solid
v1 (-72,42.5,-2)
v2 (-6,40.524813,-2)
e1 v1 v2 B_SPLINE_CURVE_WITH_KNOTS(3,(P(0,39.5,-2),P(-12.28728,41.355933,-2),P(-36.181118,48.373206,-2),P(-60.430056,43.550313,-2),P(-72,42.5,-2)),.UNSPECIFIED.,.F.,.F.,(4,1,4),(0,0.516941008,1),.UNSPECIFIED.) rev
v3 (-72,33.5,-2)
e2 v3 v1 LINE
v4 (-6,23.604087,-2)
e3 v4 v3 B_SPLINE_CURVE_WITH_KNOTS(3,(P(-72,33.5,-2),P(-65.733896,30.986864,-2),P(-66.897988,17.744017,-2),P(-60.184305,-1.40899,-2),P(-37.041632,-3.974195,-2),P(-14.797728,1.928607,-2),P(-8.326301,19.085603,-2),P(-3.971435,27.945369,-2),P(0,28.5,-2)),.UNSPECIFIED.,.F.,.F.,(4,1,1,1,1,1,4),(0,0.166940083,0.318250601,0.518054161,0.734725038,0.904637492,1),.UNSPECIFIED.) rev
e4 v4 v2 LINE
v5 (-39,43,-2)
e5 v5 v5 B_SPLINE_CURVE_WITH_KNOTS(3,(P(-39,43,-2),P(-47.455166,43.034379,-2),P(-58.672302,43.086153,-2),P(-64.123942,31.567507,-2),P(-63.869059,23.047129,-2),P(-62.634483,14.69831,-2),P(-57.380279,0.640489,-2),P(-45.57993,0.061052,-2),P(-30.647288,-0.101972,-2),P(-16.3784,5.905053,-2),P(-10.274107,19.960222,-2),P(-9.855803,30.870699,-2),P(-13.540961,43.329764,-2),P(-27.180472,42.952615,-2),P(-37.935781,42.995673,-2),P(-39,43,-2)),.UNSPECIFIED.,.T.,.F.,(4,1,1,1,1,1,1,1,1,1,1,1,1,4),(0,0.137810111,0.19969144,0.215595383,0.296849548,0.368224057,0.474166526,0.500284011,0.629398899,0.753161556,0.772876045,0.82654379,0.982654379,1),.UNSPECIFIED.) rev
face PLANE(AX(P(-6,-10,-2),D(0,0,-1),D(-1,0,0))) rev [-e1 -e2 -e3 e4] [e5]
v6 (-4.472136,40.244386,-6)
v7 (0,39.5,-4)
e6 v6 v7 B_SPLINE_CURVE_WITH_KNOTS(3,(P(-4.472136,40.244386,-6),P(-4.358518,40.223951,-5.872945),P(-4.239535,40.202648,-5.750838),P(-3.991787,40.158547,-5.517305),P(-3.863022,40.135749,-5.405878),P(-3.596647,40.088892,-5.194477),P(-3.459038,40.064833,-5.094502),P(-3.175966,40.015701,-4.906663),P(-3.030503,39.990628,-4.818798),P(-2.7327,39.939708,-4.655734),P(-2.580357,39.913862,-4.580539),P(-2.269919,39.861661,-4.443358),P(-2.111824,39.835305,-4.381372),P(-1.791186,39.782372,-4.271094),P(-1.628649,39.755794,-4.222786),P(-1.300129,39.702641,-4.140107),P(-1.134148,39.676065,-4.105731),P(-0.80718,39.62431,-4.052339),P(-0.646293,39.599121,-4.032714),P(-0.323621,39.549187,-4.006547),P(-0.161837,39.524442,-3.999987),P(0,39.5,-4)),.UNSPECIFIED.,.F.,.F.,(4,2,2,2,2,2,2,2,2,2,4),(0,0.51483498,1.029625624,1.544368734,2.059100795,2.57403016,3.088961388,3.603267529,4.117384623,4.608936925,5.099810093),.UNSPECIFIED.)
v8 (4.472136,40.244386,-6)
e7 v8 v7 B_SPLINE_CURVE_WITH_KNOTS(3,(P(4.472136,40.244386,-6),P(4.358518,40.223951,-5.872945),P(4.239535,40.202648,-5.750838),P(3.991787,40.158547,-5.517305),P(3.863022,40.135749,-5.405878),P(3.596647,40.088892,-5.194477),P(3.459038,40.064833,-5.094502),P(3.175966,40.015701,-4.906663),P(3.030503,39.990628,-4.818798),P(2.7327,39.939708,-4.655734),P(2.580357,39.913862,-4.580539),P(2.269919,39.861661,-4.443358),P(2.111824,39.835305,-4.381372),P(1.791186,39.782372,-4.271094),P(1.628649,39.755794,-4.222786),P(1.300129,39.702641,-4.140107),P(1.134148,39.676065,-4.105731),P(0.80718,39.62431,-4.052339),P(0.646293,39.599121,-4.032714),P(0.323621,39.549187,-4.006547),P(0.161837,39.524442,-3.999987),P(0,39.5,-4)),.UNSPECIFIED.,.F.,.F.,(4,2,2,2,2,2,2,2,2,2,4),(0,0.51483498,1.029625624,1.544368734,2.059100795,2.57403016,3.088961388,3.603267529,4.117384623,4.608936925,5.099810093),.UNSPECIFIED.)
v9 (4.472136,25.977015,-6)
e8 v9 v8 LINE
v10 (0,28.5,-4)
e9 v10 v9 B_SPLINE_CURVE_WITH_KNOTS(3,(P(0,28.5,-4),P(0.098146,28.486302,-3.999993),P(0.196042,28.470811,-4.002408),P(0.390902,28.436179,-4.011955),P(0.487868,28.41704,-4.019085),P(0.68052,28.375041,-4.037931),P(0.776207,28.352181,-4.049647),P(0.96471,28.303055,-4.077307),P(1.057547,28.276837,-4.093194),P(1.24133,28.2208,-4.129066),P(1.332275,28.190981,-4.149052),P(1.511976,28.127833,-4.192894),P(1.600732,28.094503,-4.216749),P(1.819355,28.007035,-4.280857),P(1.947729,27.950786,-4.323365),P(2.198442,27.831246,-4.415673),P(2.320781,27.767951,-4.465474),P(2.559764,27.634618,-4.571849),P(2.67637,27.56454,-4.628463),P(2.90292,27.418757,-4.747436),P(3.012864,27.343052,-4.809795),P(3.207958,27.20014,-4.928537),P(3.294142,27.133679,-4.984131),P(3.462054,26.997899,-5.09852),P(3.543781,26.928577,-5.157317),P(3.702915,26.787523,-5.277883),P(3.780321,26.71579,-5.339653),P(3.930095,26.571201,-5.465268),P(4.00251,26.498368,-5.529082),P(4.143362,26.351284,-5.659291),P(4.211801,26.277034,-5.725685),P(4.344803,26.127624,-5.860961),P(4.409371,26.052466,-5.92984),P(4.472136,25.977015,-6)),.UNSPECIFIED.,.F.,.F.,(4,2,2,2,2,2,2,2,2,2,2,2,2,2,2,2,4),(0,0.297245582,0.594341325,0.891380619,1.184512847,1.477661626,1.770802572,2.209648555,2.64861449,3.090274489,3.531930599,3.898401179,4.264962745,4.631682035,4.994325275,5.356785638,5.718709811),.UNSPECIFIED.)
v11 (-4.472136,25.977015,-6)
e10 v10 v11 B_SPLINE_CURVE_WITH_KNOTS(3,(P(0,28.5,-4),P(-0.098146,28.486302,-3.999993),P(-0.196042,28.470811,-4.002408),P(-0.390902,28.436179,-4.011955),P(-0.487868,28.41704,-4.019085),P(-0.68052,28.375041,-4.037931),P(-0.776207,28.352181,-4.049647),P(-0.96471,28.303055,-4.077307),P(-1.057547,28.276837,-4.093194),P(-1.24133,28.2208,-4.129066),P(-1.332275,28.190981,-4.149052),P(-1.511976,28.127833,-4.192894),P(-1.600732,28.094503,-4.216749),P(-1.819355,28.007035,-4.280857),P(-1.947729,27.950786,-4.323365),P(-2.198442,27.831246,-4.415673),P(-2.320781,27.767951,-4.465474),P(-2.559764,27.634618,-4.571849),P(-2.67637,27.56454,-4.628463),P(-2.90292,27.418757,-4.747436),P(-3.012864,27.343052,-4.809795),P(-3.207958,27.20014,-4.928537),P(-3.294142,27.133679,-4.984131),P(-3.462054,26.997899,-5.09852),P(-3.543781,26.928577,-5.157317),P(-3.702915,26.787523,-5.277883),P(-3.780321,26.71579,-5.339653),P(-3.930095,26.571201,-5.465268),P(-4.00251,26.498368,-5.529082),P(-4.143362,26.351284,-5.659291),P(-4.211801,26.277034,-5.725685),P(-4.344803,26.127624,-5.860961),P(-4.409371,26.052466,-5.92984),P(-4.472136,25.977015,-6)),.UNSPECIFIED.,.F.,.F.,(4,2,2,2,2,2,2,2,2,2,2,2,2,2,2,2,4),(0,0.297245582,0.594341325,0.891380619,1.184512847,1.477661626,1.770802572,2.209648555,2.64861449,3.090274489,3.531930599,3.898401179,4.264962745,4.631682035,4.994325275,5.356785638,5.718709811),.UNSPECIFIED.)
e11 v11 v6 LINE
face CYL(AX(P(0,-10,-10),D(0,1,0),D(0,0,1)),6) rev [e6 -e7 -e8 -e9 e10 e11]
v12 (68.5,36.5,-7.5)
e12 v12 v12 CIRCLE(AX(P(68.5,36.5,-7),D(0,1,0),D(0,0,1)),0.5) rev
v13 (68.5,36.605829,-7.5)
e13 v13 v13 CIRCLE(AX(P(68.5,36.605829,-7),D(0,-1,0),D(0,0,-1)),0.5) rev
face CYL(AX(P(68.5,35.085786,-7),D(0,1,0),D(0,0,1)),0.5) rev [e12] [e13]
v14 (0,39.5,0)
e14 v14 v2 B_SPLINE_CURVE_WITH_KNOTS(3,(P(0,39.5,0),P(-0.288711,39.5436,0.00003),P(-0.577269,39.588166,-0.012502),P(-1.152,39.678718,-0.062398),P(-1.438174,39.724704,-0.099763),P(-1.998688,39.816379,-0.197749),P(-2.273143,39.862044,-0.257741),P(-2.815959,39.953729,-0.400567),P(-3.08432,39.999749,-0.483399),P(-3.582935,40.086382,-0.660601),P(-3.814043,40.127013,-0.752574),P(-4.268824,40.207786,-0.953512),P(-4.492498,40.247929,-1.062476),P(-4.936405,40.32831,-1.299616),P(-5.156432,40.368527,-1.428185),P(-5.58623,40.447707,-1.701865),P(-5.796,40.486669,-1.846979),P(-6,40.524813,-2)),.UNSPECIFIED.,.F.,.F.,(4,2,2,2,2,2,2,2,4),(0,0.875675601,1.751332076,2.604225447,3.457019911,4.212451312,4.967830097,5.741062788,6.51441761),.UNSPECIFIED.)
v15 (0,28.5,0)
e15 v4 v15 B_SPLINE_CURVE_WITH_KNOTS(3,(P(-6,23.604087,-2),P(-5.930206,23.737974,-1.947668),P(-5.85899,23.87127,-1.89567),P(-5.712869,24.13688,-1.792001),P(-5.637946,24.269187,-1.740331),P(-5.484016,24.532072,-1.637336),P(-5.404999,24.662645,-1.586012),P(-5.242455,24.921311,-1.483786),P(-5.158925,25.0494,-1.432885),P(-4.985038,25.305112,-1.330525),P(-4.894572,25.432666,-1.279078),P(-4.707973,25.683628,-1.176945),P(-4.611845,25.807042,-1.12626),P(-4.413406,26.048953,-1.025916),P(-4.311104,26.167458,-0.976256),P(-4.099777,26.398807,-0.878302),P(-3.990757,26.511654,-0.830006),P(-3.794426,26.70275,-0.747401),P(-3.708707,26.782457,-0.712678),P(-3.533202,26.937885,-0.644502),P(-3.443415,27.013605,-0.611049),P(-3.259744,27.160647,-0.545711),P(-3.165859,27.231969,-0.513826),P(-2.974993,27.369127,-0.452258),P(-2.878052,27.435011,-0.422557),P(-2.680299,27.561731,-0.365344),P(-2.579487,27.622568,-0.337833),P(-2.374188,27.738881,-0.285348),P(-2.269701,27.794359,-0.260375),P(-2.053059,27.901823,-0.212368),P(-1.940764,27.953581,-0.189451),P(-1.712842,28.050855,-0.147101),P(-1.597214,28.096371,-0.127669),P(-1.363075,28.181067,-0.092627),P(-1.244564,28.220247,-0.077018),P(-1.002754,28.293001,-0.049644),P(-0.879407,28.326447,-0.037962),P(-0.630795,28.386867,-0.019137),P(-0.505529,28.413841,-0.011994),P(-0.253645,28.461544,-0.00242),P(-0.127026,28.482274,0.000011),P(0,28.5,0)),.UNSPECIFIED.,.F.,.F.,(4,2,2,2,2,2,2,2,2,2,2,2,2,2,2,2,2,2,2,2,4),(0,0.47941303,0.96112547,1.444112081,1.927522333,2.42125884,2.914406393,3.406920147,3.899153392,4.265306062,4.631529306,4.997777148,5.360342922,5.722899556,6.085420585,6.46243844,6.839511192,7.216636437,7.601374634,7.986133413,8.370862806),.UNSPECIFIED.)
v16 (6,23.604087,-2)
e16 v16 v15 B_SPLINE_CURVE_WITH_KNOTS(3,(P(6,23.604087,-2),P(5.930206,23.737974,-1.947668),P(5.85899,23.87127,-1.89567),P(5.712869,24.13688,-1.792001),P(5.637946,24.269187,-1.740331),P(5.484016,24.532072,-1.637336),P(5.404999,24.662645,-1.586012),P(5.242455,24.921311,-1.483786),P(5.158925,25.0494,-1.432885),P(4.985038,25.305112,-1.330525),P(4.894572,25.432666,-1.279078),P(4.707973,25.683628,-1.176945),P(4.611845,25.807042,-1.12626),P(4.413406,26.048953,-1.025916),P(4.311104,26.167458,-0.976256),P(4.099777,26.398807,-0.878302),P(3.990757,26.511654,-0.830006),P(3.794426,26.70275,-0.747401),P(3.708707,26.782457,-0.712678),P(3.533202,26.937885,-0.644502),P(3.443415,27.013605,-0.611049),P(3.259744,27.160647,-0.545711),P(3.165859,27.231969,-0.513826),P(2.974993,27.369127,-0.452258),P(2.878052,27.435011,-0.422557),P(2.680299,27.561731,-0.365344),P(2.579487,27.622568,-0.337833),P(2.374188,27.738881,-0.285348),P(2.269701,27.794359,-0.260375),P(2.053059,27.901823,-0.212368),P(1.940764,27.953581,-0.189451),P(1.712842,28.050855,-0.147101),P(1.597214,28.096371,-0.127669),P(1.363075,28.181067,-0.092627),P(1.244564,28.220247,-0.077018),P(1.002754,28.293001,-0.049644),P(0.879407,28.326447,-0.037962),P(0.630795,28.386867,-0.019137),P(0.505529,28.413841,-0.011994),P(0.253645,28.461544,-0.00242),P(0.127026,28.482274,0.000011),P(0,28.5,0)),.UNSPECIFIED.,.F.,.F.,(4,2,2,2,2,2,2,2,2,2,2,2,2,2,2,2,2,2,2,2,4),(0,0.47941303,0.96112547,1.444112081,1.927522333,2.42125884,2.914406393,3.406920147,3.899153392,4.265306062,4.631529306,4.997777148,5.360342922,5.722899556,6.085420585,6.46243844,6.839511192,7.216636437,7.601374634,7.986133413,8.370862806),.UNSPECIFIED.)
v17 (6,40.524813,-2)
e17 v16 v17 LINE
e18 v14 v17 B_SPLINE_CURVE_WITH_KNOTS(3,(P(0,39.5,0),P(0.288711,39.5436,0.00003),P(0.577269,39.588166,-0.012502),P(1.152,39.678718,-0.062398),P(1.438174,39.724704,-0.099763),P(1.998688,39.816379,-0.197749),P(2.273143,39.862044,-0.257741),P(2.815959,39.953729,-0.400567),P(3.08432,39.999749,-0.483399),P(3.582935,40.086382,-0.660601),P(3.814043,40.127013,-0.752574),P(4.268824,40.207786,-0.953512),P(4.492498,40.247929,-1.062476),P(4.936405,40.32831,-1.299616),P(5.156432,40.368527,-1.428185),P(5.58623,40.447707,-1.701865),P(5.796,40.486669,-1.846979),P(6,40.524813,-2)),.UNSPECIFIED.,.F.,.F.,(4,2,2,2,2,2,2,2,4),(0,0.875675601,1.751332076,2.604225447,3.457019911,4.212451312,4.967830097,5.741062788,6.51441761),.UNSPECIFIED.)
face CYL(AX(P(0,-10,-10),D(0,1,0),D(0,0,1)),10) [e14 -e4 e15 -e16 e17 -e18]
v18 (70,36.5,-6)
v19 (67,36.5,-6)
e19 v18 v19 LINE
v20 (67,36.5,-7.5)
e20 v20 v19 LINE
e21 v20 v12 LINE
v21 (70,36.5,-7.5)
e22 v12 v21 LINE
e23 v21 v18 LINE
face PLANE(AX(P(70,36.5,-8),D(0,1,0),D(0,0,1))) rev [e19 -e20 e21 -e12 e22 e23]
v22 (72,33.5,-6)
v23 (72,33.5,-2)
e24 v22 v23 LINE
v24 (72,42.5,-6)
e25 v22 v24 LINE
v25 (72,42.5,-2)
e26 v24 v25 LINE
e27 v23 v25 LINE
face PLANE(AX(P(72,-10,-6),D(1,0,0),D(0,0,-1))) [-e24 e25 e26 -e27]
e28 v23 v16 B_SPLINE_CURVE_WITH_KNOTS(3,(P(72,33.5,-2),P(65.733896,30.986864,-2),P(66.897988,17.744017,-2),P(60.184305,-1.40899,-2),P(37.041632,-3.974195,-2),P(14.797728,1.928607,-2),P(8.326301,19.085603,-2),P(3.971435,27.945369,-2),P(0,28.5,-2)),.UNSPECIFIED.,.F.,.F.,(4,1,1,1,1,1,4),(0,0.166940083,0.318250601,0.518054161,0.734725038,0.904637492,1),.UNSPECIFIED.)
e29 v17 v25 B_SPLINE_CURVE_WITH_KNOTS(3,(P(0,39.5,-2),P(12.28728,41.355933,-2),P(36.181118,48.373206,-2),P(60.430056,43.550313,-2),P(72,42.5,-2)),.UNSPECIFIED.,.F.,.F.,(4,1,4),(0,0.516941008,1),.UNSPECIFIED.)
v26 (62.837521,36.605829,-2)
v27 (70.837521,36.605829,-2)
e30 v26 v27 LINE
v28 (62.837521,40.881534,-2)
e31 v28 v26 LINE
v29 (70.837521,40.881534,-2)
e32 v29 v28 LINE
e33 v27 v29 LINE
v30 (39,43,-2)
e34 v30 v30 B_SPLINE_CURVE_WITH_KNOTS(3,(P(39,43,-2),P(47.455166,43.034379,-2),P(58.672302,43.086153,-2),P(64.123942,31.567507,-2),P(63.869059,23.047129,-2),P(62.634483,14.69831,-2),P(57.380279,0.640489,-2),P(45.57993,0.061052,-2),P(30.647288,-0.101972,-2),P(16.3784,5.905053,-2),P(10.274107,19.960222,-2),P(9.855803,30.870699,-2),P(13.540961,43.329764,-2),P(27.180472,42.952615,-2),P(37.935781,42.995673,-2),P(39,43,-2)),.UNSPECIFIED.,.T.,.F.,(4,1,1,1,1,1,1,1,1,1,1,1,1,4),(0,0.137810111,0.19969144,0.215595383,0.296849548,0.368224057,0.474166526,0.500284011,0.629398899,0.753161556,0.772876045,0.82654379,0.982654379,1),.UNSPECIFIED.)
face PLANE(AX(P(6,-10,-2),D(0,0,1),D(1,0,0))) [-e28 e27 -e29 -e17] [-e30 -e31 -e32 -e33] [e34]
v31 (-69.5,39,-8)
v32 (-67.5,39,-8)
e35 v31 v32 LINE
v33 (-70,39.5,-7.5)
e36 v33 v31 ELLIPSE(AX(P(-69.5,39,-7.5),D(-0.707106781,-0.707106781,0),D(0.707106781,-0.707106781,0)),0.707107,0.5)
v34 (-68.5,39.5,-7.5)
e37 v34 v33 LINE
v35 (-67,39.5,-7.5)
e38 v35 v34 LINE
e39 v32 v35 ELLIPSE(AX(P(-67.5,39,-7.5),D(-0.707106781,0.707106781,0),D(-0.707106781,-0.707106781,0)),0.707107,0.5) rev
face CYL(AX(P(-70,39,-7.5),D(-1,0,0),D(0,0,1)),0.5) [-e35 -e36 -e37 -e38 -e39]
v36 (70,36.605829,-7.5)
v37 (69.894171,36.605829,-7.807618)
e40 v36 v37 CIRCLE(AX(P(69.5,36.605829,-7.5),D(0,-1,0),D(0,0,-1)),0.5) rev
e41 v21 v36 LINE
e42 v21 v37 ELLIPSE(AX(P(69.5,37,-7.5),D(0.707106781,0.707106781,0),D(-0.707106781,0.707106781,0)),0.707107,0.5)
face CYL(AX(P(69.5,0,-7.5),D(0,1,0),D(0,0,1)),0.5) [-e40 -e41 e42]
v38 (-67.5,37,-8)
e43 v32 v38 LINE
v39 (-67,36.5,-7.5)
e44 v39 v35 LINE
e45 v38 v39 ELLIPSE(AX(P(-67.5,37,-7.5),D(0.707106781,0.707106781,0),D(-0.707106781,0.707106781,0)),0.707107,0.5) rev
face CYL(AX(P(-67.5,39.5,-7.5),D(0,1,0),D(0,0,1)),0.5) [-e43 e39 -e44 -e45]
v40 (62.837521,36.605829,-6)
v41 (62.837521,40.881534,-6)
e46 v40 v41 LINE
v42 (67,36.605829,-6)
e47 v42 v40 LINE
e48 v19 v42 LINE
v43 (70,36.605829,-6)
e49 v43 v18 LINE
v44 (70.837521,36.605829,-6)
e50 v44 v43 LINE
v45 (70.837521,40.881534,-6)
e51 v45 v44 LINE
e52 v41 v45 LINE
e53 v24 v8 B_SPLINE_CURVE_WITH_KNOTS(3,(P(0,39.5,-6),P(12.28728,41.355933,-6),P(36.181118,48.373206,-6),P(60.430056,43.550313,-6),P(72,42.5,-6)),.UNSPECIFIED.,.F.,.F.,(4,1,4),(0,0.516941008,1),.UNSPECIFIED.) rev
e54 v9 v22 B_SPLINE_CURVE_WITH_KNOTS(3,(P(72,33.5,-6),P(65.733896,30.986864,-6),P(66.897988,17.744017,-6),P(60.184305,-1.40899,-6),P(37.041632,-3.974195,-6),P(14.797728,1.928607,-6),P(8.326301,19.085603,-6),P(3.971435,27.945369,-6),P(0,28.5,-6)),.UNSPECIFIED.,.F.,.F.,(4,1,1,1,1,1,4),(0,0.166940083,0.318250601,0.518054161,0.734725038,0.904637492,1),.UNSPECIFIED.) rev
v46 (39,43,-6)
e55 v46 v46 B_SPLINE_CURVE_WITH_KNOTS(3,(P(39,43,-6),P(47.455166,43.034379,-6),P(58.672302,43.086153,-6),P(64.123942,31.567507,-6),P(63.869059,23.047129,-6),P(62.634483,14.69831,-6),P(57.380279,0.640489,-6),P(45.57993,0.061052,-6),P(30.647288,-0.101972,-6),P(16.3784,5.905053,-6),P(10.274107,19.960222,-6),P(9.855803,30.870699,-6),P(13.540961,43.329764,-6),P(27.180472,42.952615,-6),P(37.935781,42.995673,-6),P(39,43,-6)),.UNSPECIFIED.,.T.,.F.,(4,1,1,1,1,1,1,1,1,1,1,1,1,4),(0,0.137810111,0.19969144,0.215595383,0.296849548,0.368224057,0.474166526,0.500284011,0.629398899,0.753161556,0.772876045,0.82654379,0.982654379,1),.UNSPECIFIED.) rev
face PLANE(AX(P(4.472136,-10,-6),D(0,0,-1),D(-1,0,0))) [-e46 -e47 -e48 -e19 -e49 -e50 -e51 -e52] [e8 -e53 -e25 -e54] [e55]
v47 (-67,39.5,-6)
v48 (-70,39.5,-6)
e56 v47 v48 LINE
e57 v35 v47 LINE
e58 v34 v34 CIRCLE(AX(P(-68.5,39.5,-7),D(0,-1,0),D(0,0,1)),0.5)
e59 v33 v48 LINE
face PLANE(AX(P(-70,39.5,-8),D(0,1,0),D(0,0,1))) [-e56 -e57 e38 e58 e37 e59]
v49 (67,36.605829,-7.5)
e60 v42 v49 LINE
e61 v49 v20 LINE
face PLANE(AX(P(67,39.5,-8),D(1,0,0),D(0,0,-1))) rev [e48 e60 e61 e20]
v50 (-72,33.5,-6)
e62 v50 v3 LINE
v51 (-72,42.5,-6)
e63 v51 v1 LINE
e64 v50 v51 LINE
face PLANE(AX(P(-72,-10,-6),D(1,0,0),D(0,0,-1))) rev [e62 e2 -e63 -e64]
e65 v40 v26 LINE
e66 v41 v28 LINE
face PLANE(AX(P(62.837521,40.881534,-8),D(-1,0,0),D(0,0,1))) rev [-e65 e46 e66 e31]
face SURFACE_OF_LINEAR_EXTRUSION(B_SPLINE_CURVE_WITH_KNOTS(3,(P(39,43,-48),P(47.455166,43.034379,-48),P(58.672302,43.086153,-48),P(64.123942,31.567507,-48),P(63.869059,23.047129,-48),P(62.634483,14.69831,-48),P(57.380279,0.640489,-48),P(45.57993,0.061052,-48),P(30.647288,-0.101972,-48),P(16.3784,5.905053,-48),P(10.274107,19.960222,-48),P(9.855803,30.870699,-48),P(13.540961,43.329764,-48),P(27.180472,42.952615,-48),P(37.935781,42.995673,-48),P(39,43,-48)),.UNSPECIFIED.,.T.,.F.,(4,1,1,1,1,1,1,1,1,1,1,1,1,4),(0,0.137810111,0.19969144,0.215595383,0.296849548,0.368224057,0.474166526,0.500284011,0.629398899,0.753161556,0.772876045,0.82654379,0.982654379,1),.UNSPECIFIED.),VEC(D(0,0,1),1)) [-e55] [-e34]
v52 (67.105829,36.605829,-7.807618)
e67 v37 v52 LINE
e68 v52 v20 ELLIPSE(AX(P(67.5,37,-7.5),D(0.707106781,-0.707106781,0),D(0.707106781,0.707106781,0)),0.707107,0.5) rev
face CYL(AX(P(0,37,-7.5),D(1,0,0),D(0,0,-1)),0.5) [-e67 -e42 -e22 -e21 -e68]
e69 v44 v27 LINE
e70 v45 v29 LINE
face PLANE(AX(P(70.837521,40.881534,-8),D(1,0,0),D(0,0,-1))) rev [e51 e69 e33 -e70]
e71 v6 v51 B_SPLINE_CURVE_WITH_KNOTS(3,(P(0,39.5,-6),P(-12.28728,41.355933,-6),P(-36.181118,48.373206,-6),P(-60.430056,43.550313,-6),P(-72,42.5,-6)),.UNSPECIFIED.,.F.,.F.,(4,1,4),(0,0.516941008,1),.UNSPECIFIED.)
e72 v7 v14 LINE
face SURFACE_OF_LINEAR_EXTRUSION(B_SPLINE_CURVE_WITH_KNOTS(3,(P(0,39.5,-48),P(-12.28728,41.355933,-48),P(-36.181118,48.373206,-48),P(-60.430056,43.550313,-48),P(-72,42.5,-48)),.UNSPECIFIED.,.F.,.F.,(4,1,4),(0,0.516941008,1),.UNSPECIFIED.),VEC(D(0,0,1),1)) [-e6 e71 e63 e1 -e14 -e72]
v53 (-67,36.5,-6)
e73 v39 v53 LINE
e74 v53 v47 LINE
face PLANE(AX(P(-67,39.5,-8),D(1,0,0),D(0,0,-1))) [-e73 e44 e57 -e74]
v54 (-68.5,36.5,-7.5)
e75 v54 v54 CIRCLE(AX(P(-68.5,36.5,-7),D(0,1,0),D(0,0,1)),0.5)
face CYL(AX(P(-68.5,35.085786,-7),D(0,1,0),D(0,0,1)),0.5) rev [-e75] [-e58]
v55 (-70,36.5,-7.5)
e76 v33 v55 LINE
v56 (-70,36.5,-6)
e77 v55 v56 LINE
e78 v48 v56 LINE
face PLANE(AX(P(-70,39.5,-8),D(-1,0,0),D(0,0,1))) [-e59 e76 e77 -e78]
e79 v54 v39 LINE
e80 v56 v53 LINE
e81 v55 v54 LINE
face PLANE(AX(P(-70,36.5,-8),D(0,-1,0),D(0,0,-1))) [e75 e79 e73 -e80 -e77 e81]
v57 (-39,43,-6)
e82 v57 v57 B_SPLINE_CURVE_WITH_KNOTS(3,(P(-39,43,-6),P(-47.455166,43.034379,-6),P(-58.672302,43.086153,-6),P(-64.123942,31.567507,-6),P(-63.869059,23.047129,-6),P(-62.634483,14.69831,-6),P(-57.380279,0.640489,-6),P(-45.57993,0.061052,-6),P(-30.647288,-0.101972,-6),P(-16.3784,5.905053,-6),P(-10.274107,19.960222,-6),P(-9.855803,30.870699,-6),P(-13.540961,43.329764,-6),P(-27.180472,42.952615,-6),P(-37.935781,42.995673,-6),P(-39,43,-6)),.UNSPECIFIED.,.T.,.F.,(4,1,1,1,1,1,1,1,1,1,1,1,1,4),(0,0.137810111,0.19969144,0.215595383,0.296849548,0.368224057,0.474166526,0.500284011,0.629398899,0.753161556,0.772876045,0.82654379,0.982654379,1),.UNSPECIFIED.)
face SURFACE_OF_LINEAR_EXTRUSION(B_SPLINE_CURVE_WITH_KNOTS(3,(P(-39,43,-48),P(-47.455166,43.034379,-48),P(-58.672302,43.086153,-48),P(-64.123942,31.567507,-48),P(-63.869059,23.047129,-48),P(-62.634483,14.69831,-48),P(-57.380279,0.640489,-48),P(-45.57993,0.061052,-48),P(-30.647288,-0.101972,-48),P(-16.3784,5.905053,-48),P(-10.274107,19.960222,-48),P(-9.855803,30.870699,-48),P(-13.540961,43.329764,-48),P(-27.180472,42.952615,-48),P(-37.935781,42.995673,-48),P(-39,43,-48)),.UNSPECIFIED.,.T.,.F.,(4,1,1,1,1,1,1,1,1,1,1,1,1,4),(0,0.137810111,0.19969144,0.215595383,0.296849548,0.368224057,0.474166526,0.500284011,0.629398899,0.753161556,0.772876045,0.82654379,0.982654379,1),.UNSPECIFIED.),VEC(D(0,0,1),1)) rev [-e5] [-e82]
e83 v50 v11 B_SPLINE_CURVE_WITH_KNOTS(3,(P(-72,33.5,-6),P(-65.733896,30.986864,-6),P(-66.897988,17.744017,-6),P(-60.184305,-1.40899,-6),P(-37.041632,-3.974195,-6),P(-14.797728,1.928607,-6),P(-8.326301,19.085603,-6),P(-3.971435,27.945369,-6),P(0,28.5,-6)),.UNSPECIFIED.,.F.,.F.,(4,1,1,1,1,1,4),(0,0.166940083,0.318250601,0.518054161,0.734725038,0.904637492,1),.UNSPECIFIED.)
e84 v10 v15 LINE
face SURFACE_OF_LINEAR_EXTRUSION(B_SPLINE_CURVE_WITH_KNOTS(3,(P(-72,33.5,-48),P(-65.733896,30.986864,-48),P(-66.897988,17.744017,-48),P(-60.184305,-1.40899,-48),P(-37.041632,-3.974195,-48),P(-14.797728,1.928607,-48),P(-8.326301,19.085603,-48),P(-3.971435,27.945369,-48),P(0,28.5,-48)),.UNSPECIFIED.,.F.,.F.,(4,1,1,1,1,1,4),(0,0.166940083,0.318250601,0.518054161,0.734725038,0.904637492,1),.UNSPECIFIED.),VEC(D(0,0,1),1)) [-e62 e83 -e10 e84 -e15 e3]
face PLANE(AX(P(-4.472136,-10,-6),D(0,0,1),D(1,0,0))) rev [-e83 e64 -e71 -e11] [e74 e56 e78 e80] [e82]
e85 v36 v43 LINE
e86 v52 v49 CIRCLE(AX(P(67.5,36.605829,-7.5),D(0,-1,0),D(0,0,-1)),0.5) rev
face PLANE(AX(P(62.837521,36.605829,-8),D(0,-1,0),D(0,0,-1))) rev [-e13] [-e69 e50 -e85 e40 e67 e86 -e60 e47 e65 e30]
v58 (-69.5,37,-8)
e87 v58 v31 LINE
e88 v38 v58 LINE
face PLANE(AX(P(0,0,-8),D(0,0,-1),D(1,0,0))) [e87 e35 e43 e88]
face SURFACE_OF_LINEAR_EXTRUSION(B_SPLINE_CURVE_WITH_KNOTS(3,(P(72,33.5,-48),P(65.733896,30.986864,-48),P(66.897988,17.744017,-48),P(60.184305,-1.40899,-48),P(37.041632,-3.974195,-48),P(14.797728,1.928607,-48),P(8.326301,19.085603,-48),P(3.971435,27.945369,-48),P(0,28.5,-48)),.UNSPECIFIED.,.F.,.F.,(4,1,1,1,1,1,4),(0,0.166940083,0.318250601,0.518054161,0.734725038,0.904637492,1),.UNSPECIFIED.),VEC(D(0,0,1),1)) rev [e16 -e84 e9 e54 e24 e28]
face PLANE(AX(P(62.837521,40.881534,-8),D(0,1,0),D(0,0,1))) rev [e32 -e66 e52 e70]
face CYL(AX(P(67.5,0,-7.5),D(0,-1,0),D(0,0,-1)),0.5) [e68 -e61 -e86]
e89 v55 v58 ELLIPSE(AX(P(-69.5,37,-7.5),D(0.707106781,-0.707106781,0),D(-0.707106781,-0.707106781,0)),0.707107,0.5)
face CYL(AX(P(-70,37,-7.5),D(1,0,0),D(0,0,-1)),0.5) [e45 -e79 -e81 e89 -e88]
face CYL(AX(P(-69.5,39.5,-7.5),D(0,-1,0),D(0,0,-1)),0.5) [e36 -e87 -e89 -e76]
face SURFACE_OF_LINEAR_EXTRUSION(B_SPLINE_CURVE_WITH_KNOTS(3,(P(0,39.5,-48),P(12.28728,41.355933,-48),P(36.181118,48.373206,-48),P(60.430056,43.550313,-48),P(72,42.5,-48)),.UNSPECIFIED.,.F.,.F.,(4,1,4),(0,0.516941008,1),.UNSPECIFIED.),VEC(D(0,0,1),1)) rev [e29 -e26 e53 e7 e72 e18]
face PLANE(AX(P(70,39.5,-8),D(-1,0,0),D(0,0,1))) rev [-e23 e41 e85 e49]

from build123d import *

# Parameters (mm, degrees)
BOSS_EXTRUDE2_START = -10
BOSS_EXTRUDE2_DEPTH = 58
CUT_EXTRUDE1_DEPTH  = 48
CUT_EXTRUDE3_DEPTH  = 48
SKETCH7_W           = 3
SKETCH7_H           = 3
BOSS_EXTRUDE4_DEPTH = 2
FILLET1_R           = 0.5
SKETCH8_R           = 0.5
CUT_EXTRUDE4_DEPTH  = 3
SKETCH9_W           = 8
SKETCH9_H           = 4.275705382
CUT_EXTRUDE6_DEPTH  = 86.382960974


# Read off the part's stored shape, not the designer's step: Mirror3
with BuildPart() as part:
    # Sketch2 → Boss-Extrude2 (new body)
    with BuildSketch(Plane(origin=(0, 0, 0), x_dir=(1, 0, 0), z_dir=(0, 1, 0)).offset(BOSS_EXTRUDE2_START)):
        with BuildLine():
            Line((6, 2), (72, 2))
            Line((72, 2), (72, 6))
            Line((72, 6), (4.472135955, 6))
            ThreePointArc((4.472135955, 6), (2.449489743, 4.522774425), (0, 4))
            Line((0, 4), (0, 0))
            ThreePointArc((0, 0), (3.16227766, 0.513167019), (6, 2))
        make_face()
    boss_extrude2 = extrude(amount=BOSS_EXTRUDE2_DEPTH)

    # Sketch4 → Cut-Extrude1 (cut)
    with BuildSketch(Plane.XY):
        with BuildLine():
            Line((75.181024804, -21.70251563), (72, 33.5))
            add(Edge.make_bspline(
                [(72, 33.5), (65.733895707, 30.986863851), (66.897988293, 17.744017336), (60.184304866, -1.408989634), (37.041632207, -3.974195098), (14.79772784, 1.928607021), (8.326301166, 19.085602566), (3.971434767, 27.945368893), (0, 28.5)],
                knots=[0, 0, 0, 0, 0.166940083, 0.318250601, 0.518054161, 0.734725038, 0.904637492, 1, 1, 1, 1], degree=3))
            Line((0, 28.5), (-1.793667206, -21.70251563))
            Line((-1.793667206, -21.70251563), (75.181024804, -21.70251563))
        make_face()
        with BuildLine():
            Line((0, 39.5), (0, 66.878987003))
            Line((0, 66.878987003), (72, 65.421074967))
            Line((72, 65.421074967), (72, 42.5))
            add(Edge.make_bspline(
                [(0, 39.5), (12.28727979, 41.355933166), (36.181117827, 48.373206471), (60.430055597, 43.550313065), (72, 42.5)],
                knots=[0, 0, 0, 0, 0.516941008, 1, 1, 1, 1], degree=3))
        make_face()
    cut_extrude1 = extrude(amount=-CUT_EXTRUDE1_DEPTH, mode=Mode.SUBTRACT)

    # Sketch3 → Cut-Extrude3 (cut)
    with BuildSketch(Plane.XY):
        with BuildLine():
            add(Edge.make_bspline(
                [(39, 43), (47.455166281, 43.034379293), (58.672301943, 43.086153016), (64.123941507, 31.567507143), (63.869059347, 23.047129354), (62.634483109, 14.698309693), (57.380279449, 0.640489267), (45.579929681, 0.061052081), (30.647288037, -0.10197224), (16.378399599, 5.905052669), (10.27410697, 19.960221638), (9.855802774, 30.870699355), (13.540960725, 43.329764048), (27.180471598, 42.952614894), (37.93578121, 42.995672813), (39, 43)],
                knots=[0, 0, 0, 0, 0.137810111, 0.19969144, 0.215595383, 0.296849548, 0.368224057, 0.474166526, 0.500284011, 0.629398899, 0.753161556, 0.772876045, 0.82654379, 0.982654379, 1, 1, 1, 1], degree=3))
        make_face()
    cut_extrude3 = extrude(amount=-CUT_EXTRUDE3_DEPTH, mode=Mode.SUBTRACT)

    # Mirror2: Boss-Extrude2, Cut-Extrude1, Cut-Extrude3 across plane
    add(boss_extrude2.mirror(Plane(origin=(0, 0, 0), x_dir=(0, 0, 1), z_dir=(1, 0, 0))))
    add(cut_extrude1.mirror(Plane(origin=(0, 0, 0), x_dir=(0, 0, 1), z_dir=(1, 0, 0))), mode=Mode.SUBTRACT)
    add(cut_extrude3.mirror(Plane(origin=(0, 0, 0), x_dir=(0, 0, 1), z_dir=(1, 0, 0))), mode=Mode.SUBTRACT)

    # Sketch7 → Boss-Extrude4 (add)
    with BuildSketch(Plane(origin=(0, 0, -6), x_dir=(-1, 0, 0), z_dir=(0, 0, -1))):
        with Locations((-68.5, 38)):
            Rectangle(SKETCH7_W, SKETCH7_H)
    extrude(amount=BOSS_EXTRUDE4_DEPTH)

    # Fillet1
    fillet1_edges = [part.edges().sort_by_distance(p)[0] for p in [
        (70, 38, -8),
        (68.5, 36.5, -8),
        (67, 38, -8),
        (68.5, 39.5, -8),
    ]]
    fillet(fillet1_edges, radius=FILLET1_R)

    # Sketch8 → Cut-Extrude4 (cut)
    with BuildSketch(Plane(origin=(0, 39.5, 0), x_dir=(1, 0, 0), z_dir=(0, 1, 0))):
        with Locations(Location((68.5, 7, 0), (0, 0, 90))):
            Circle(SKETCH8_R)
    extrude(amount=-CUT_EXTRUDE4_DEPTH, mode=Mode.SUBTRACT)

    # Mirror3: part across plane


with BuildPart() as part_1:
    add(part.part)
    add(part.part.mirror(Plane(origin=(0, 0, 0), x_dir=(0, 0, 1), z_dir=(1, 0, 0))))

    # Sketch9 → Cut-Extrude6 (cut, through all)
    with BuildSketch(Plane.XY.offset(-2)):
        with Locations((66.83752114, 38.743681376)):
            Rectangle(SKETCH9_W, SKETCH9_H)
    extrude(amount=-CUT_EXTRUDE6_DEPTH, mode=Mode.SUBTRACT)


solid = part_1.part
